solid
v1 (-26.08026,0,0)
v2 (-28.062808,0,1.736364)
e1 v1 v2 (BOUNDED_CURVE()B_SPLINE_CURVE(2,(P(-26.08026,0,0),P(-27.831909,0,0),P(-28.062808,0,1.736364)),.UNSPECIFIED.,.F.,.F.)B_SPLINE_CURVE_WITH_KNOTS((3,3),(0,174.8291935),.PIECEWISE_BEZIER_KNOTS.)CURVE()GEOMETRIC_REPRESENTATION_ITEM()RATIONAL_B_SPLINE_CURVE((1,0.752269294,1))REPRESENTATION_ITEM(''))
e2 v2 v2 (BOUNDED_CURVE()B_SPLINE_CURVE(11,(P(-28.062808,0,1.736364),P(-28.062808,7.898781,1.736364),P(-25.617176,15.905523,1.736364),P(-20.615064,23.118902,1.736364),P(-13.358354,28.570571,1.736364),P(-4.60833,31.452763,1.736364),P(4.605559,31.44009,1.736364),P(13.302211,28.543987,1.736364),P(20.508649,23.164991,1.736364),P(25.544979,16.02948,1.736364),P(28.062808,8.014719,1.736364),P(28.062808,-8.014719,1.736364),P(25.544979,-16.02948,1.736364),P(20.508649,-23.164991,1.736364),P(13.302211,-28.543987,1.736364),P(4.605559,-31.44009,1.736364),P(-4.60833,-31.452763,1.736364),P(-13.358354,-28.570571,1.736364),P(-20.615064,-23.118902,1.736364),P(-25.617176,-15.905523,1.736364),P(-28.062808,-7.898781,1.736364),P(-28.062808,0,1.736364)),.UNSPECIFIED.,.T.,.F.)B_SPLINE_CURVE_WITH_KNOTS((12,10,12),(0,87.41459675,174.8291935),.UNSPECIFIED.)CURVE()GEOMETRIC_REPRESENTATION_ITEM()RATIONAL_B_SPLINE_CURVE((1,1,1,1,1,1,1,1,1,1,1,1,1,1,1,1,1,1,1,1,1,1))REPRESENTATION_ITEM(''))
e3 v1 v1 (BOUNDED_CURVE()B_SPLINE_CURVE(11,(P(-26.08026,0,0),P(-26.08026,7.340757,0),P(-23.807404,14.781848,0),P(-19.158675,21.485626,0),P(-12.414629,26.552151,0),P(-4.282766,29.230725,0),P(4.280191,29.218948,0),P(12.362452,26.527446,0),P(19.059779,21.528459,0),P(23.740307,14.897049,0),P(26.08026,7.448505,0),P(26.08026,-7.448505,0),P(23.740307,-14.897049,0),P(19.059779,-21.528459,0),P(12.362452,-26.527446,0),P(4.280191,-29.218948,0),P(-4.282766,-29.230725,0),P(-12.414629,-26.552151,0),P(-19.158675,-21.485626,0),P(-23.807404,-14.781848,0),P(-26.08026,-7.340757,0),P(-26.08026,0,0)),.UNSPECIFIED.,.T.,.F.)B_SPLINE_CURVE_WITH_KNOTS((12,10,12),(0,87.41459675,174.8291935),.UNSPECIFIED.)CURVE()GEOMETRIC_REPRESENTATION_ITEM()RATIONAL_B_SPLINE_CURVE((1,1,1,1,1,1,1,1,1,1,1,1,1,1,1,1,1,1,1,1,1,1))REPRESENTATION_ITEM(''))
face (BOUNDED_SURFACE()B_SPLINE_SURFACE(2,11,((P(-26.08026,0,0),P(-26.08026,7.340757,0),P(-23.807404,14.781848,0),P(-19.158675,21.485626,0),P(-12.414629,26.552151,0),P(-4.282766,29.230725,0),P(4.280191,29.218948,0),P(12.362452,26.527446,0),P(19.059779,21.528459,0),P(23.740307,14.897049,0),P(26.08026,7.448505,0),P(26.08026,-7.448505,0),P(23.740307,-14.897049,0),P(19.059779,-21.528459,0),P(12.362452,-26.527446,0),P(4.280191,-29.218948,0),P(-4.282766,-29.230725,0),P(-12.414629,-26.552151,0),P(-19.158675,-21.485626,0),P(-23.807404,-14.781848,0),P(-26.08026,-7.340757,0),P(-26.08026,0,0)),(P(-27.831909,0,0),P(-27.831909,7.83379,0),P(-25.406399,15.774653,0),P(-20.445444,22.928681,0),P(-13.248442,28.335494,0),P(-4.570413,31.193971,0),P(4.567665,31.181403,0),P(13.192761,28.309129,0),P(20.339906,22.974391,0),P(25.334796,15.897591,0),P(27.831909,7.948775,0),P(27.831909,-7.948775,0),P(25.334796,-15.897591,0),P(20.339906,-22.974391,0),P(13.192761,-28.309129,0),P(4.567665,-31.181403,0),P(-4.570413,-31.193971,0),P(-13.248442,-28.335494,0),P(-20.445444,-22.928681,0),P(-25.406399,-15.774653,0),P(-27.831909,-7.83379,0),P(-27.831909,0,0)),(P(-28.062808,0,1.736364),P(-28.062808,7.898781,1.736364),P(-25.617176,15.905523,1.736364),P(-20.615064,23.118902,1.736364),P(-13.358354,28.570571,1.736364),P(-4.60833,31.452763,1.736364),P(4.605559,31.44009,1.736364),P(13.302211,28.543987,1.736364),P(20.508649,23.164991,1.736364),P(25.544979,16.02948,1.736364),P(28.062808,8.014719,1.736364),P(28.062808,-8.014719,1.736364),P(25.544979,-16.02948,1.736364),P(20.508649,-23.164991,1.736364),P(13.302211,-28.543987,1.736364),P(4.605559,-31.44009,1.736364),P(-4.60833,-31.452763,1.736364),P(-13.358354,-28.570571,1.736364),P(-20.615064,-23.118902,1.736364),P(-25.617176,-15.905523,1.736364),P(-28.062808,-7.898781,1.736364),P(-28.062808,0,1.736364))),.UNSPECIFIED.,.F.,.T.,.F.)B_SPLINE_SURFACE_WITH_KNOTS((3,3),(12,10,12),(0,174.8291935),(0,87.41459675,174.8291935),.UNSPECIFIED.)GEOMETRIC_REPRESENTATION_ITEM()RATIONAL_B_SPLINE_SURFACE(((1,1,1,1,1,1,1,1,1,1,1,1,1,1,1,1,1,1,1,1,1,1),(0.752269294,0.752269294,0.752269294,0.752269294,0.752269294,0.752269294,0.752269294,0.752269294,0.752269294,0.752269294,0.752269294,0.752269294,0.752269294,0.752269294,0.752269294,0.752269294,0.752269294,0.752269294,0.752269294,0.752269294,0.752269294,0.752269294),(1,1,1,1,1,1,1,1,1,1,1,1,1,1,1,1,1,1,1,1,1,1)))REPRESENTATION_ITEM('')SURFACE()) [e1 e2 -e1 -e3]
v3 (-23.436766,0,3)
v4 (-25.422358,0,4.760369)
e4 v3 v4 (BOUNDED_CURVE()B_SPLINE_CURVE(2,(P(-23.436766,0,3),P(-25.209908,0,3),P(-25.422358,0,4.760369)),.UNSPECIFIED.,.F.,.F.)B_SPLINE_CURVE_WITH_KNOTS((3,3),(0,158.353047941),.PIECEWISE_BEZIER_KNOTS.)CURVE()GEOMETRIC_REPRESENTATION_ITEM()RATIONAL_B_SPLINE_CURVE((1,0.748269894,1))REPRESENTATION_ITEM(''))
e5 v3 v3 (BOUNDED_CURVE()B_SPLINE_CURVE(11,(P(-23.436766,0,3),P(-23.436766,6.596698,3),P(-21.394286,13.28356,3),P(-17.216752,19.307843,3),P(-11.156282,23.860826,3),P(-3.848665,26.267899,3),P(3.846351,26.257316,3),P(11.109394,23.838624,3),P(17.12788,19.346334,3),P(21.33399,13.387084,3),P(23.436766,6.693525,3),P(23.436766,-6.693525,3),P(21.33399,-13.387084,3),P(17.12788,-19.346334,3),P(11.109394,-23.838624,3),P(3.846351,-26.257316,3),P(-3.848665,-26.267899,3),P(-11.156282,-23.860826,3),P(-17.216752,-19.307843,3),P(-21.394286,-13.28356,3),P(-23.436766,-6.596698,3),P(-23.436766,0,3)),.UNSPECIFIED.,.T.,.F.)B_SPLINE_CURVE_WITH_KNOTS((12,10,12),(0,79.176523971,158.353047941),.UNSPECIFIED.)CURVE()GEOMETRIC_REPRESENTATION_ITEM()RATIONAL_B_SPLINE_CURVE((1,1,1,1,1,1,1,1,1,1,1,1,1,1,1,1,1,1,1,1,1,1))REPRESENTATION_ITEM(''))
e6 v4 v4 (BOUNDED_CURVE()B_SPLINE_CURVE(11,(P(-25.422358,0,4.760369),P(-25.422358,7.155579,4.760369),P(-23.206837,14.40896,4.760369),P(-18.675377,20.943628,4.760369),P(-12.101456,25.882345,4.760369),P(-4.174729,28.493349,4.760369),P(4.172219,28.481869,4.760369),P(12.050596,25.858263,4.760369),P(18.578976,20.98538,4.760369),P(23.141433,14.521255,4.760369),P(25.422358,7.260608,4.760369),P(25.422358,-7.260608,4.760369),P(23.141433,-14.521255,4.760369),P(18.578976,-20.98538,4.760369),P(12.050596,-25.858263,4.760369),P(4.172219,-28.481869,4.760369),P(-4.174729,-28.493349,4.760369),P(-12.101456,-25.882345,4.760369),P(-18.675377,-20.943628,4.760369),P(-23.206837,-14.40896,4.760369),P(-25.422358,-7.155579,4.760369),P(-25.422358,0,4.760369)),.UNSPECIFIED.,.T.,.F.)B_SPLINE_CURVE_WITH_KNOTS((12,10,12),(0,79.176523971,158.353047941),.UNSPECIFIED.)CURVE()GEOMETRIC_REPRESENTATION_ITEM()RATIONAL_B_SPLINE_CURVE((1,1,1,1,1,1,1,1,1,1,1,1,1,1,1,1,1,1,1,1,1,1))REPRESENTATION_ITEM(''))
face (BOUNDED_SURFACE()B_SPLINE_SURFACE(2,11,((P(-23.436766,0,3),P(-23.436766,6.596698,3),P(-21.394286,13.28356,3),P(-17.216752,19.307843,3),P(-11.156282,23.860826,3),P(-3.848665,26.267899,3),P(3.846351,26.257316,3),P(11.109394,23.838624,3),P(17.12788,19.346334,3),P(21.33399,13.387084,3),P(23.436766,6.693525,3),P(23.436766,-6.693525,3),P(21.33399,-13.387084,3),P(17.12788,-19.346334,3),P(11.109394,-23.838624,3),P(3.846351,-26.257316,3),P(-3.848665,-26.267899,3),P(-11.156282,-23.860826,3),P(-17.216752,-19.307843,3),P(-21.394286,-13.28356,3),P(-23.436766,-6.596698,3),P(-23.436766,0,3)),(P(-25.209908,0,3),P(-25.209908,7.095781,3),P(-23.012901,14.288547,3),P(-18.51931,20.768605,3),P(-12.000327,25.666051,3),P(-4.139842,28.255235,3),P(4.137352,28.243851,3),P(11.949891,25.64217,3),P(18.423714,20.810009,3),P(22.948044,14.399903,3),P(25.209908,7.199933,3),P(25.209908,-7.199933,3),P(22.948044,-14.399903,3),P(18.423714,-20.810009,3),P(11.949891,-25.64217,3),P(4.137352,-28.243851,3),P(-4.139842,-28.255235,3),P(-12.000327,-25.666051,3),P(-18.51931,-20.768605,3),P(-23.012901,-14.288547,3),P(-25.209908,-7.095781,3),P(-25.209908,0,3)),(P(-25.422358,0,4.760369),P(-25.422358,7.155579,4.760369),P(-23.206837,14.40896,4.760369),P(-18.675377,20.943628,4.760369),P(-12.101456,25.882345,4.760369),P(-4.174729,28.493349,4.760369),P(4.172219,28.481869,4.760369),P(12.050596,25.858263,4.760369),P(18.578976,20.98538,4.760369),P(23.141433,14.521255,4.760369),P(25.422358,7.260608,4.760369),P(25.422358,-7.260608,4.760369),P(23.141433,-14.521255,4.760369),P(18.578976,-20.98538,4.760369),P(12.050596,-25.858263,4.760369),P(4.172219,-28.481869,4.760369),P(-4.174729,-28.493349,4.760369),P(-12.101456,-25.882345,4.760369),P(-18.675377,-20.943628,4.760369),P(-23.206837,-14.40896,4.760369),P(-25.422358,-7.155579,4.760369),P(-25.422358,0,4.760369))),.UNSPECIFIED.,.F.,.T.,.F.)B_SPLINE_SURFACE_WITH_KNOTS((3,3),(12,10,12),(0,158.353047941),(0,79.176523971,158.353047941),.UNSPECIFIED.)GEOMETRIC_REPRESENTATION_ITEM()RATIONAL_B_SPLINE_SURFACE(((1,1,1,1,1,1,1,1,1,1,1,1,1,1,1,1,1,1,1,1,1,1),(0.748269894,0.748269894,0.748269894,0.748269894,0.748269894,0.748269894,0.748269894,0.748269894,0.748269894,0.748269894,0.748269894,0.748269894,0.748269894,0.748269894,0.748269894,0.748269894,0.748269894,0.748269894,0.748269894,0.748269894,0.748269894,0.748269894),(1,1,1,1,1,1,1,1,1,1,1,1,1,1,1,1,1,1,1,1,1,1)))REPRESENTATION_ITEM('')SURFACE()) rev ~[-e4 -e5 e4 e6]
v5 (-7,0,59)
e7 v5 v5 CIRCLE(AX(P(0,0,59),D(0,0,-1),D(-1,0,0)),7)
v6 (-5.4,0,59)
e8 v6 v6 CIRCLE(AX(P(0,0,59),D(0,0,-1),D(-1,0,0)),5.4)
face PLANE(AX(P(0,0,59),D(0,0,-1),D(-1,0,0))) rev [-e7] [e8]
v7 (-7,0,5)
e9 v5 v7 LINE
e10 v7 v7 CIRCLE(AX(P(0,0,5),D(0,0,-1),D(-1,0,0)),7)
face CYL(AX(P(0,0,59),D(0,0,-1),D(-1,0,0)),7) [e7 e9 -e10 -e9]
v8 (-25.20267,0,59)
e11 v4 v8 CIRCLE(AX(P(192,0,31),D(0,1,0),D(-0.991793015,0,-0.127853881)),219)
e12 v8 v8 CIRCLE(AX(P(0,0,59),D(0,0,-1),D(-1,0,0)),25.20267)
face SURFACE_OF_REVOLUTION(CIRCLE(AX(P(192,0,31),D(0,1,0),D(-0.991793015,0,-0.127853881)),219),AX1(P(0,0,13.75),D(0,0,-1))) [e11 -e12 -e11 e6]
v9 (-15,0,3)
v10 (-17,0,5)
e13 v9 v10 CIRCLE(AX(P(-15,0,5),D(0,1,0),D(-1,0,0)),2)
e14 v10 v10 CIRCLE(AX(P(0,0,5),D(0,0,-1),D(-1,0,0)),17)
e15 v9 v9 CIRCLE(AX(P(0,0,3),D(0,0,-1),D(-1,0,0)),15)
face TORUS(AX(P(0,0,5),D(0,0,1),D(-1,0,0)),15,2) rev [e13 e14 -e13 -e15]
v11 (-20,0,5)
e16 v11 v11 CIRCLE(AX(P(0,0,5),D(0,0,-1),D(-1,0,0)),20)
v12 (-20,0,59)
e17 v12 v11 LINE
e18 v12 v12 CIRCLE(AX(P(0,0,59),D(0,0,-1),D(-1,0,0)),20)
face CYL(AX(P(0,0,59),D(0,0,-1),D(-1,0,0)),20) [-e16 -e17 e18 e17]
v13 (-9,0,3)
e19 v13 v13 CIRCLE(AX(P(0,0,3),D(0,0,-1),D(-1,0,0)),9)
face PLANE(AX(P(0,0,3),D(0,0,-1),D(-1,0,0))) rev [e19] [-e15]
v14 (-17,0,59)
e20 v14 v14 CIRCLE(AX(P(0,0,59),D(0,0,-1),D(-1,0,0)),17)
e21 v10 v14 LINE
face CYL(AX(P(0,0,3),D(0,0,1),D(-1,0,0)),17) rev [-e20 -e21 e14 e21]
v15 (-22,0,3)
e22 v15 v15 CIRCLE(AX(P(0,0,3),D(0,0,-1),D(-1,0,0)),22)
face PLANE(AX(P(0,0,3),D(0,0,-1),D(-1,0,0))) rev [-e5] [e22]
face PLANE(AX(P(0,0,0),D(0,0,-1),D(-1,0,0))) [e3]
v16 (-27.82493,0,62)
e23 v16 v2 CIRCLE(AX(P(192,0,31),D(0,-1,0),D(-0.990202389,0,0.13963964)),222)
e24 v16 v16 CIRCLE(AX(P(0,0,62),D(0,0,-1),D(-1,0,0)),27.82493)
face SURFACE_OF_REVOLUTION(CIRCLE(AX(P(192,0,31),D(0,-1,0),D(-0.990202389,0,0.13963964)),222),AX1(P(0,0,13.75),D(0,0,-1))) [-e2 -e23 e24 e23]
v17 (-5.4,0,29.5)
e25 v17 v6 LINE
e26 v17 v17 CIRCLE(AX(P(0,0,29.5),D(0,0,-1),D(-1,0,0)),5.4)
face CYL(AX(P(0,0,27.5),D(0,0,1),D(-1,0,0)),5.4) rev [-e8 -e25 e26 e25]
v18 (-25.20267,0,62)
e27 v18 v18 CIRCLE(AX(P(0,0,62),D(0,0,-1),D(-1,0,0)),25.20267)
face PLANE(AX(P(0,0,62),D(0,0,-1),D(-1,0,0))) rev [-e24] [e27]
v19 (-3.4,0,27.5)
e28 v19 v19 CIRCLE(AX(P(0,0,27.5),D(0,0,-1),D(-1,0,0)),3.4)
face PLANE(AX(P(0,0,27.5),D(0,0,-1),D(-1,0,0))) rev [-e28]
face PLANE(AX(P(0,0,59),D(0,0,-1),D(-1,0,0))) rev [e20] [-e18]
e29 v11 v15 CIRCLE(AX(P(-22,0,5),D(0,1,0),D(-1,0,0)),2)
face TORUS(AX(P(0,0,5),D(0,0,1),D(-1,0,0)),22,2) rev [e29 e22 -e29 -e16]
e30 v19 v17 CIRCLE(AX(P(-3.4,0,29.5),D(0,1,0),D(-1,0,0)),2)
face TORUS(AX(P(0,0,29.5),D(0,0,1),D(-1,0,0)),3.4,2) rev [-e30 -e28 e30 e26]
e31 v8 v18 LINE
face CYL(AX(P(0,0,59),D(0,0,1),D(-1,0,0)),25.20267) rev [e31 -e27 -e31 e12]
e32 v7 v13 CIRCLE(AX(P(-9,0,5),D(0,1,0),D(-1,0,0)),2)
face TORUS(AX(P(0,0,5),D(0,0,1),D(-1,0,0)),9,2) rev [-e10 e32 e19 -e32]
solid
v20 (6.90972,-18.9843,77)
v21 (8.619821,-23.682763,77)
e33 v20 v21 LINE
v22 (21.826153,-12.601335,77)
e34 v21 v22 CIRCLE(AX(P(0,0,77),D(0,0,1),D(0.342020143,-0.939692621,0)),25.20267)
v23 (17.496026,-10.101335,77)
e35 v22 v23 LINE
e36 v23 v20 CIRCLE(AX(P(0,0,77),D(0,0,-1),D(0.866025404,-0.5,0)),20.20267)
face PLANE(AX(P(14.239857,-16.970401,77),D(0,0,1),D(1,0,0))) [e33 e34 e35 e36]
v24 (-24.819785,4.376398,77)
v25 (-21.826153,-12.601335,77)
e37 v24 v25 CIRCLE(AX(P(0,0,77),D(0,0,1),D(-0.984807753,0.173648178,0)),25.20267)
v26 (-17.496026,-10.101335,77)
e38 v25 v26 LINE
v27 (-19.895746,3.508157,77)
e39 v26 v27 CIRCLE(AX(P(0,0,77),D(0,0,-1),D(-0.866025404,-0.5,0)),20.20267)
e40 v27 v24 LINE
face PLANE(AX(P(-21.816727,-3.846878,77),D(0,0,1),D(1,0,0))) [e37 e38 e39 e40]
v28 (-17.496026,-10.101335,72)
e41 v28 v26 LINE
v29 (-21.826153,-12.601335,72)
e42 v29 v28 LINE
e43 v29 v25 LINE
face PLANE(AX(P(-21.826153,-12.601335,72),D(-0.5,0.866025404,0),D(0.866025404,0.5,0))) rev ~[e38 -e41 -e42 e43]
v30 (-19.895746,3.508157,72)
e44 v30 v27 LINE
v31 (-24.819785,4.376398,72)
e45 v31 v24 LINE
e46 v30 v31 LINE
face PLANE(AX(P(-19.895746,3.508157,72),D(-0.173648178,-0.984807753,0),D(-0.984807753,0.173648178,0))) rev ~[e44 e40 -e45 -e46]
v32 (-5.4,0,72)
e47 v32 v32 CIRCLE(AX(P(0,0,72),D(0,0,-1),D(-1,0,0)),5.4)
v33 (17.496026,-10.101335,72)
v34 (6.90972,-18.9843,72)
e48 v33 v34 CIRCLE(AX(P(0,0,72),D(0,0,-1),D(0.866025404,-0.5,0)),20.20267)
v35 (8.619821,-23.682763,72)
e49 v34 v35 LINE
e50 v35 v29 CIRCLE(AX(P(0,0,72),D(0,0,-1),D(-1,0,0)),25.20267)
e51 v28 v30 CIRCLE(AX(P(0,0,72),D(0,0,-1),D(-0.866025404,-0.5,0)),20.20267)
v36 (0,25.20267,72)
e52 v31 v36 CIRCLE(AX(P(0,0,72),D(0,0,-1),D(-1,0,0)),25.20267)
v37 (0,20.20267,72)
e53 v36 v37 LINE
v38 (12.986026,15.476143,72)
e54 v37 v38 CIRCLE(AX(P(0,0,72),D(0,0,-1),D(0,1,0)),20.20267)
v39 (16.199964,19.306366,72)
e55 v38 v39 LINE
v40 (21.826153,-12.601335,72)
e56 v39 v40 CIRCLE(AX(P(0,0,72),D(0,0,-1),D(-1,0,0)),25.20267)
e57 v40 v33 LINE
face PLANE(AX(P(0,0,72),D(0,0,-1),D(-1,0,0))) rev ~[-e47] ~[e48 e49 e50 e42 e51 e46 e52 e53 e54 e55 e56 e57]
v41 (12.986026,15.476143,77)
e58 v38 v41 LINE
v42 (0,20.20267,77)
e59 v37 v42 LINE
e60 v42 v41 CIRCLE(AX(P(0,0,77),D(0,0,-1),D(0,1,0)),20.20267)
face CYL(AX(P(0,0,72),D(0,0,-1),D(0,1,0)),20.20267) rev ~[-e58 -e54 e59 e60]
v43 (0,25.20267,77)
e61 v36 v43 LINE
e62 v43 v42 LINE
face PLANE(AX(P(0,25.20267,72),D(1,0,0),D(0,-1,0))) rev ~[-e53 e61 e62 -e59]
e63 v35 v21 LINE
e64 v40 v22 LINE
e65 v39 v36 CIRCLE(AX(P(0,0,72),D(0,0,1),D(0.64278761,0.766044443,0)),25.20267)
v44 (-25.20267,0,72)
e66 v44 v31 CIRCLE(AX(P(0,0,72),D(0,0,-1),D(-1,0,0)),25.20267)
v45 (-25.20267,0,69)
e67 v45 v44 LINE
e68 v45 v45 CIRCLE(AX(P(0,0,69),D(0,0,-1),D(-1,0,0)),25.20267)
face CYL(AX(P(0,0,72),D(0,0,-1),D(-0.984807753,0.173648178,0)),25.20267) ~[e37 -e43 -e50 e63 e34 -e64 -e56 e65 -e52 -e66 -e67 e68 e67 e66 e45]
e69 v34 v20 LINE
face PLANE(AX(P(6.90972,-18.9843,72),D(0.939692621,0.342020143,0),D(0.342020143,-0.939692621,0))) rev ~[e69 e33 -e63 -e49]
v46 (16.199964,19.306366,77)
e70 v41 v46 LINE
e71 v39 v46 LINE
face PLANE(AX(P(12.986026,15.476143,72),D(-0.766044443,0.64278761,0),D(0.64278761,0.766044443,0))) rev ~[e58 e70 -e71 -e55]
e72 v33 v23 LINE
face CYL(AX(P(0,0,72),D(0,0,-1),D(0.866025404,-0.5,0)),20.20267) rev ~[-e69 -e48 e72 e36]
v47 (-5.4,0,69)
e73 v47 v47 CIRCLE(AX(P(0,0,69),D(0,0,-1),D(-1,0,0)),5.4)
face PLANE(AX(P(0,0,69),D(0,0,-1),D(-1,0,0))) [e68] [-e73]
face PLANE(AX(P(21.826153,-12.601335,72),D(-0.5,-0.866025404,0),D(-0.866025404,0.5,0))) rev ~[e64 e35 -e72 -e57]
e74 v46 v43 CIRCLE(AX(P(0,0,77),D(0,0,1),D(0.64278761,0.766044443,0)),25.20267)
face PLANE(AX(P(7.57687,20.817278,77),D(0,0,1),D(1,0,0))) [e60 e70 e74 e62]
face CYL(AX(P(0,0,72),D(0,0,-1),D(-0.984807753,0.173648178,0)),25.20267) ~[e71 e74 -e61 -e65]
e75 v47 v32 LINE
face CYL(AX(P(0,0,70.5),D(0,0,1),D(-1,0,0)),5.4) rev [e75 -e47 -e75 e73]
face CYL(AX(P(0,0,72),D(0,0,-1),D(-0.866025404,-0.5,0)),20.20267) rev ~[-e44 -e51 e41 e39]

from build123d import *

# Parameters (mm, degrees)
F1_W     = 19.8026703335
F1_H     = 3
F4_R     = 2
F7_DEPTH = 5


# Not quite as in the source:
# - two fillets or chamfers of one size are made in one step
# - after a boolean that leaves OpenCascade's solid faulty, fix() repairs it


with BuildPart() as f2:
    # F0 (on Front) → F2 (revolve)
    with BuildSketch(Plane.XZ):
        with BuildLine():
            Line((-27.8249303423, 0), (0, 0))
            Line((0, 0), (0, 27.5))
            Line((0, 27.5), (-5.4, 27.5))
            Line((-5.4, 27.5), (-5.4, 59))
            Line((-5.4, 59), (-7, 59))
            Line((-7, 59), (-7, 3))
            Line((-7, 3), (-17, 3))
            Line((-17, 3), (-17, 59))
            Line((-17, 59), (-20, 59))
            Line((-20, 59), (-20, 3))
            Line((-20, 3), (-25.2026703335, 3))
            ThreePointArc((-25.2026703335, 3), (-27, 31), (-25.2026703335, 59))
            Line((-25.2026703335, 59), (-25.2026703335, 62))
            Line((-25.2026703335, 62), (-27.8249303423, 62))
            ThreePointArc((-27.8249303423, 62), (-30, 31), (-27.8249303423, 0))
        make_face()
    revolve(axis=Axis((0, 0, 13.75), (0, 0, -1)))

    # F4
    f4_edges = [f2.edges().sort_by_distance(p)[0] for p in [
        (5.4, 0, 27.5),
        (17, 0, 3),
        (25.20267, 0, 3),
        (20, 0, 3),
        (27.82493, 0, 0),
        (7, 0, 3),
    ]]
    fillet(f4_edges, radius=F4_R)


with BuildPart() as f3:
    # F1 (on Front) → F3 (revolve)
    with BuildSketch(Plane.XZ):
        with Locations((-15.3013351667, 70.5)):
            Rectangle(F1_W, F1_H)
    revolve(axis=Axis((0, 0, 13.75), (0, 0, -1)))

    # F6 (on face) → F7 (join)
    with BuildSketch(Plane.XY.offset(72)):
        with BuildLine():
            Line((0, 25.2026703335), (0, 20.2026703335))
            ThreePointArc((0, 20.2026703335), (6.909720203, 18.9843002326), (12.986026173, 15.4761433451))
            Line((12.986026173, 15.4761433451), (16.1999642214, 19.3063655607))
            ThreePointArc((16.1999642214, 19.3063655607), (8.6198209197, 23.6827633365), (0, 25.2026703335))
        make_face()
        with BuildLine():
            ThreePointArc((8.6198209197, -23.6827633365), (16.1999642214, -19.3063655607), (21.826152752, -12.6013351667))
            Line((21.826152752, -12.6013351667), (17.4960257331, -10.1013351667))
            ThreePointArc((17.4960257331, -10.1013351667), (12.986026173, -15.4761433451), (6.909720203, -18.9843002326))
            Line((6.909720203, -18.9843002326), (8.6198209197, -23.6827633365))
        make_face()
        with BuildLine():
            Line((-19.895746376, 3.5081568874), (-24.819785141, 4.3763977758))
            ThreePointArc((-24.819785141, 4.3763977758), (-24.819785141, -4.3763977758), (-21.826152752, -12.6013351667))
            Line((-21.826152752, -12.6013351667), (-17.4960257331, -10.1013351667))
            ThreePointArc((-17.4960257331, -10.1013351667), (-19.895746376, -3.5081568874), (-19.895746376, 3.5081568874))
        make_face()
    extrude(amount=F7_DEPTH)

    add(f3.part.fix(), mode=Mode.REPLACE)


solid = Compound([f2.part, f3.part])
